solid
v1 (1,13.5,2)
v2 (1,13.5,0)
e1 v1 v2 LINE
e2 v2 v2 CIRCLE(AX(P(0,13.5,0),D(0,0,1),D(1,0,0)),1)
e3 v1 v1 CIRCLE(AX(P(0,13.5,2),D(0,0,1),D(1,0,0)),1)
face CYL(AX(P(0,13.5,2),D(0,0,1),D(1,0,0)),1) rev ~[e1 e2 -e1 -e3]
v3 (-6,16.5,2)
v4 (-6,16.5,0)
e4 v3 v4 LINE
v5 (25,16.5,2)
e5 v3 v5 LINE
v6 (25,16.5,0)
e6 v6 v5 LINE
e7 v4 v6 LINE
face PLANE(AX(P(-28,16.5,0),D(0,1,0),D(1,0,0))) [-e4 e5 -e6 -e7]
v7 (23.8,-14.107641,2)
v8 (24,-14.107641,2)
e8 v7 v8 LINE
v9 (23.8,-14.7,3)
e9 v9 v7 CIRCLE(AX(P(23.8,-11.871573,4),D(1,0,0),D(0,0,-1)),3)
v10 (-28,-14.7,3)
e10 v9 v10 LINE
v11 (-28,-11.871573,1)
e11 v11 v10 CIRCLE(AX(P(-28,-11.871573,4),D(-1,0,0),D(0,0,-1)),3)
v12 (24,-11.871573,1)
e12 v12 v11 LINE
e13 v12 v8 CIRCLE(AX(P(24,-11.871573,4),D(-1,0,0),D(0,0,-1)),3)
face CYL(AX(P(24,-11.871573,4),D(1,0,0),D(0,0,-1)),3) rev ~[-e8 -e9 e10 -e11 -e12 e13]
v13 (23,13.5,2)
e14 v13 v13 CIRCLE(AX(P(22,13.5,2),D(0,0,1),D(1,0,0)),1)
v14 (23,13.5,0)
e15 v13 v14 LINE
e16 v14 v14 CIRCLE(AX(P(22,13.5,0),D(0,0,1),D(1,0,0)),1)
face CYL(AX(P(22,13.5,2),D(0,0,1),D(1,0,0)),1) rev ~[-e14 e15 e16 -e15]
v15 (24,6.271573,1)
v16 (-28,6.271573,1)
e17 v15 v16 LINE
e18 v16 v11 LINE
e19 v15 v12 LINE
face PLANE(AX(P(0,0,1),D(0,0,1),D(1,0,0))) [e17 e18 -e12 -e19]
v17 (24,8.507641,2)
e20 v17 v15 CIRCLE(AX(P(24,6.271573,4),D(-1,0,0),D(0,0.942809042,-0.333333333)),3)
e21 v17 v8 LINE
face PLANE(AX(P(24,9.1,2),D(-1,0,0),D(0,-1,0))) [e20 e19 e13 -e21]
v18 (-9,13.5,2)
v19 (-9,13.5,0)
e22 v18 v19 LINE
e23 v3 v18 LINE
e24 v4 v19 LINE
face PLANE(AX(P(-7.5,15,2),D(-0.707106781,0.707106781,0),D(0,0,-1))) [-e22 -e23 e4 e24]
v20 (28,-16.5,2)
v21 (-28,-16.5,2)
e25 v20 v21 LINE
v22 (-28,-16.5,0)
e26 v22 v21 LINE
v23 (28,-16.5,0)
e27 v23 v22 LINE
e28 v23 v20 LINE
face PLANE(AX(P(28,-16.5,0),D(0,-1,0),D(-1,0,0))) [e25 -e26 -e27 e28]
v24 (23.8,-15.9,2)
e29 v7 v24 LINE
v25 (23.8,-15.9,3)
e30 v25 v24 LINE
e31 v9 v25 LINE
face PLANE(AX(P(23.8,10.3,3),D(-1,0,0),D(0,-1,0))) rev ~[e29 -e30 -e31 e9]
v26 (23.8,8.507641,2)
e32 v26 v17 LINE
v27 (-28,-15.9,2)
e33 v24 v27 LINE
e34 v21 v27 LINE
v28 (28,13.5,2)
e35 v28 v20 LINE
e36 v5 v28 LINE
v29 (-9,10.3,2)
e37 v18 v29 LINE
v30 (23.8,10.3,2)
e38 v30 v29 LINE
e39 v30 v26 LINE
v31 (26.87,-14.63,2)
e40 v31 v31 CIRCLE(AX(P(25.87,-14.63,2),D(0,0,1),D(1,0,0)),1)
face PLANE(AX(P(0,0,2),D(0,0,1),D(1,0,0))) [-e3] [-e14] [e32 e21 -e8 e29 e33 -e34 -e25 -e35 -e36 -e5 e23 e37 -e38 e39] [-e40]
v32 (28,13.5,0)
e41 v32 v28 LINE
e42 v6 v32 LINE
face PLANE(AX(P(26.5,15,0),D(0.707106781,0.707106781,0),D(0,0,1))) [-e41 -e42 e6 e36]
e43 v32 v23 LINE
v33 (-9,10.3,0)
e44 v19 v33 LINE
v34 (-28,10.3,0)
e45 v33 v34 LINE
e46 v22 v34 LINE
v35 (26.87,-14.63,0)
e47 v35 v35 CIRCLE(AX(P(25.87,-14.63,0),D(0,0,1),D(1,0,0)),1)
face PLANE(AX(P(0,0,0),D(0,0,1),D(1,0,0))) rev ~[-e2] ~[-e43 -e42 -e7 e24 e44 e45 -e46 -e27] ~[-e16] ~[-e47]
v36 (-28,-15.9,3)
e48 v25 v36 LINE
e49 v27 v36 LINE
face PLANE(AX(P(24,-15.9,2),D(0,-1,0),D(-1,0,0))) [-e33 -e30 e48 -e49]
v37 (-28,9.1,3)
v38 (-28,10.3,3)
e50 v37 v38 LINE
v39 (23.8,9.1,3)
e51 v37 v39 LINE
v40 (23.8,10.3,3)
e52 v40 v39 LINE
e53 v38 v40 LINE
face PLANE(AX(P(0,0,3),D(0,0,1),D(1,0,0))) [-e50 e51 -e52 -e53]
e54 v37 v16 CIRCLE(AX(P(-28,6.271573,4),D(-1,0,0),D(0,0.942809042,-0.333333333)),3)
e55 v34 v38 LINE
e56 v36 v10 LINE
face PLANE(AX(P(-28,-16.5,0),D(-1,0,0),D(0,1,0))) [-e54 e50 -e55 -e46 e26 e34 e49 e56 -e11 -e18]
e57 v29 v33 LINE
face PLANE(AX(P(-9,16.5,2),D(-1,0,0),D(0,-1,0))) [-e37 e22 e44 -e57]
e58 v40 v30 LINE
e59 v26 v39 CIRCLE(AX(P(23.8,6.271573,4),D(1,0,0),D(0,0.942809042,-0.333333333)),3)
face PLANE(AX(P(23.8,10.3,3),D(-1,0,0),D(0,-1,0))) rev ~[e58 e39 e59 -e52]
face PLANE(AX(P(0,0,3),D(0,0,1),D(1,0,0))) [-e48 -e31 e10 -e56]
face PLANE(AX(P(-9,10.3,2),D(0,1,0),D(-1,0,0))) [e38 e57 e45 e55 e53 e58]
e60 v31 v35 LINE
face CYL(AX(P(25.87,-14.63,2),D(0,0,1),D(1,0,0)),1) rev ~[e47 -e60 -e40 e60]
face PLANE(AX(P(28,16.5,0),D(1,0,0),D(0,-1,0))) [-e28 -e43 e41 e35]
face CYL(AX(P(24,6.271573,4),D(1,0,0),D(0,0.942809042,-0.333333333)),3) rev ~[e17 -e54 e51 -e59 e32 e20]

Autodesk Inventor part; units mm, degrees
ref_plane "YZ Plane" through (0, 0, 0) normal (1, 0, 0) x (0, 1, 0)
ref_plane "XZ Plane" through (0, 0, 0) normal (0, 1, 0) x (-1, 0, 0)
ref_plane "XY Plane" through (0, 0, 0) normal (0, 0, 1) x (1, 0, 0)
sketch "Sketch1" plane through (0, 0, 0) normal (0, 0, 1) x (1, 0, 0)
  line L0 (-28, 16.5) -> (28, 16.5)
  line L1 (28, 16.5) -> (28, -16.5)
  line L2 (28, -16.5) -> (-28, -16.5)
  line L3 (-28, -16.5) -> (-28, 16.5)
  point P0 (0, 0)
  dimension "d0" = 33
  dimension "d1" = 56
  dimension "d2" = 16.5
  dimension "d3" = 28
extrude "Extrusion1" add sketch "Sketch1" along normal blind 2
sketch "Sketch2" plane through (0, 0, 2) normal (0, 0, 1) x (1, 0, 0)
  line L0 (-28, 16.5) -> (-28, -16.5) projected
  line L1 (-28, -16.5) -> (28, -16.5) projected
  circle A0 centre (0, 13.5) radius 1
  circle A1 centre (22, 13.5) radius 1
  point P0 (0, 0)
  dimension "d6" = 28
  dimension "d7" = 30
  dimension "d8" = 50
  dimension "d9" = 30
  dimension "d10" = 2
  dimension "d11" = 2
extrude "Extrusion2" cut sketch "Sketch2" against normal blind 2
sketch "Sketch3" plane through (0, 0, 2) normal (0, 0, 1) x (1, 0, 0)
  line L0 (-28, 16.5) -> (-28, -16.5) projected
  line L1 (-28, 11.5) -> (24, 11.5)
  line L2 (24, 11.5) -> (24, -14.7)
  line L3 (24, -14.7) -> (-28, -14.7)
  line L4 (-28, -14.7) -> (-28, 11.5)
  line L5 (-28, -16.5) -> (28, -16.5) projected
  line L6 (-28, 11.5) -> (24, 11.5)
  line L7 (24, 11.5) -> (24, 9.1)
  line L8 (24, 9.1) -> (-28, 9.1)
  line L9 (-28, 9.1) -> (-28, 11.5)
  point P0 (0, 0)
  point P1 (-28, 9.1)
  point P2 (-28, -14.7)
  dimension "d14" = 1.8
  dimension "d15" = 28
  dimension "d16" = 2.4
  dimension "d17" = 52
extrude "Extrusion3" cut sketch "Sketch3" against normal blind 1 contours L8 L2 L3 L0
sketch "Sketch4" plane through (0, 0, 2) normal (0, 0, 1) x (1, 0, 0)
  line L0 (-28, -14.7) -> (-28, 9.1) projected
  line L1 (-28, -16.5) -> (28, -16.5) projected
  circle A0 centre (25.87, -14.63) radius 1
  point P0 (0, 0)
  point P1 (-28, -14.1)
  dimension "d23" = 53.87
  dimension "d24" = 1.87
  dimension "d25" = 2
extrude "Extrusion4" cut sketch "Sketch4" against normal blind 2
chamfer "Chamfer2" distance 3 angle 45 1 edges at (28, 16.5, 1)
sketch "Sketch8" plane through (0, 0, 2) normal (0, 0, 1) x (1, 0, 0)
  line L0 (25, 16.5) -> (-28, 16.5) projected
  line L1 (-28, 16.5) -> (-9, 16.5)
  line L2 (-9, 16.5) -> (-9, 10.3)
  line L3 (-9, 10.3) -> (-28, 10.3)
  line L4 (-28, 10.3) -> (-28, 16.5)
  line L5 (-28, 9.1) -> (24, 9.1) projected
  point P0 (0, 0)
  dimension "d40" = 19
  dimension "d41" = 1.2
extrude "Extrusion7" cut sketch "Sketch8" against normal blind 2
chamfer "Chamfer4" distance 3 angle 45 1 edges at (-9, 16.5, 1)
sketch "Sketch9" plane through (0, 0, 2) normal (0, 0, 1) x (1, 0, 0)
  line L0 (-28, 10.3) -> (-9, 10.3) projected
  line L1 (-28, 9.1) -> (24, 9.1) projected
  line L2 (-28, 10.3) -> (24, 10.3)
  line L3 (24, 10.3) -> (24, 9.1)
  line L4 (24, 9.1) -> (-28, 9.1)
  line L5 (-28, 9.1) -> (-28, 10.3)
  line L6 (24, -14.7) -> (-28, -14.7) projected
  line L7 (-28, -14.7) -> (24, -14.7)
  line L8 (24, -14.7) -> (24, -15.9)
  line L9 (24, -15.9) -> (-28, -15.9)
  line L10 (-28, -15.9) -> (-28, -14.7)
  line L11 (24, 9.1) -> (24, -14.7) projected
  point P0 (0, 0)
  dimension "d47" = 1.2
extrude "Extrusion8" add sketch "Sketch9" along normal blind 1
fillet "Fillet1" radius 3 2 edges at (-2, 9.1, 1) (-2, -14.7, 1)
sketch "Sketch10" plane through (0, 0, 3) normal (0, 0, 1) x (1, 0, 0)
  line L0 (24, 9.1) -> (24, 10.3) projected
  line L1 (-28, -15.9) -> (24, -15.9) projected
  line L2 (24, 10.3) -> (23.8, 10.3)
  line L3 (23.8, 10.3) -> (23.8, -15.9)
  line L4 (23.8, -15.9) -> (24, -15.9)
  line L5 (24, -15.9) -> (24, 10.3)
  point P0 (0, 0)
  dimension "d51" = 0.2
extrude "Extrusion9" cut sketch "Sketch10" against normal blind 1
properties part number "hdmi_base_plate"
